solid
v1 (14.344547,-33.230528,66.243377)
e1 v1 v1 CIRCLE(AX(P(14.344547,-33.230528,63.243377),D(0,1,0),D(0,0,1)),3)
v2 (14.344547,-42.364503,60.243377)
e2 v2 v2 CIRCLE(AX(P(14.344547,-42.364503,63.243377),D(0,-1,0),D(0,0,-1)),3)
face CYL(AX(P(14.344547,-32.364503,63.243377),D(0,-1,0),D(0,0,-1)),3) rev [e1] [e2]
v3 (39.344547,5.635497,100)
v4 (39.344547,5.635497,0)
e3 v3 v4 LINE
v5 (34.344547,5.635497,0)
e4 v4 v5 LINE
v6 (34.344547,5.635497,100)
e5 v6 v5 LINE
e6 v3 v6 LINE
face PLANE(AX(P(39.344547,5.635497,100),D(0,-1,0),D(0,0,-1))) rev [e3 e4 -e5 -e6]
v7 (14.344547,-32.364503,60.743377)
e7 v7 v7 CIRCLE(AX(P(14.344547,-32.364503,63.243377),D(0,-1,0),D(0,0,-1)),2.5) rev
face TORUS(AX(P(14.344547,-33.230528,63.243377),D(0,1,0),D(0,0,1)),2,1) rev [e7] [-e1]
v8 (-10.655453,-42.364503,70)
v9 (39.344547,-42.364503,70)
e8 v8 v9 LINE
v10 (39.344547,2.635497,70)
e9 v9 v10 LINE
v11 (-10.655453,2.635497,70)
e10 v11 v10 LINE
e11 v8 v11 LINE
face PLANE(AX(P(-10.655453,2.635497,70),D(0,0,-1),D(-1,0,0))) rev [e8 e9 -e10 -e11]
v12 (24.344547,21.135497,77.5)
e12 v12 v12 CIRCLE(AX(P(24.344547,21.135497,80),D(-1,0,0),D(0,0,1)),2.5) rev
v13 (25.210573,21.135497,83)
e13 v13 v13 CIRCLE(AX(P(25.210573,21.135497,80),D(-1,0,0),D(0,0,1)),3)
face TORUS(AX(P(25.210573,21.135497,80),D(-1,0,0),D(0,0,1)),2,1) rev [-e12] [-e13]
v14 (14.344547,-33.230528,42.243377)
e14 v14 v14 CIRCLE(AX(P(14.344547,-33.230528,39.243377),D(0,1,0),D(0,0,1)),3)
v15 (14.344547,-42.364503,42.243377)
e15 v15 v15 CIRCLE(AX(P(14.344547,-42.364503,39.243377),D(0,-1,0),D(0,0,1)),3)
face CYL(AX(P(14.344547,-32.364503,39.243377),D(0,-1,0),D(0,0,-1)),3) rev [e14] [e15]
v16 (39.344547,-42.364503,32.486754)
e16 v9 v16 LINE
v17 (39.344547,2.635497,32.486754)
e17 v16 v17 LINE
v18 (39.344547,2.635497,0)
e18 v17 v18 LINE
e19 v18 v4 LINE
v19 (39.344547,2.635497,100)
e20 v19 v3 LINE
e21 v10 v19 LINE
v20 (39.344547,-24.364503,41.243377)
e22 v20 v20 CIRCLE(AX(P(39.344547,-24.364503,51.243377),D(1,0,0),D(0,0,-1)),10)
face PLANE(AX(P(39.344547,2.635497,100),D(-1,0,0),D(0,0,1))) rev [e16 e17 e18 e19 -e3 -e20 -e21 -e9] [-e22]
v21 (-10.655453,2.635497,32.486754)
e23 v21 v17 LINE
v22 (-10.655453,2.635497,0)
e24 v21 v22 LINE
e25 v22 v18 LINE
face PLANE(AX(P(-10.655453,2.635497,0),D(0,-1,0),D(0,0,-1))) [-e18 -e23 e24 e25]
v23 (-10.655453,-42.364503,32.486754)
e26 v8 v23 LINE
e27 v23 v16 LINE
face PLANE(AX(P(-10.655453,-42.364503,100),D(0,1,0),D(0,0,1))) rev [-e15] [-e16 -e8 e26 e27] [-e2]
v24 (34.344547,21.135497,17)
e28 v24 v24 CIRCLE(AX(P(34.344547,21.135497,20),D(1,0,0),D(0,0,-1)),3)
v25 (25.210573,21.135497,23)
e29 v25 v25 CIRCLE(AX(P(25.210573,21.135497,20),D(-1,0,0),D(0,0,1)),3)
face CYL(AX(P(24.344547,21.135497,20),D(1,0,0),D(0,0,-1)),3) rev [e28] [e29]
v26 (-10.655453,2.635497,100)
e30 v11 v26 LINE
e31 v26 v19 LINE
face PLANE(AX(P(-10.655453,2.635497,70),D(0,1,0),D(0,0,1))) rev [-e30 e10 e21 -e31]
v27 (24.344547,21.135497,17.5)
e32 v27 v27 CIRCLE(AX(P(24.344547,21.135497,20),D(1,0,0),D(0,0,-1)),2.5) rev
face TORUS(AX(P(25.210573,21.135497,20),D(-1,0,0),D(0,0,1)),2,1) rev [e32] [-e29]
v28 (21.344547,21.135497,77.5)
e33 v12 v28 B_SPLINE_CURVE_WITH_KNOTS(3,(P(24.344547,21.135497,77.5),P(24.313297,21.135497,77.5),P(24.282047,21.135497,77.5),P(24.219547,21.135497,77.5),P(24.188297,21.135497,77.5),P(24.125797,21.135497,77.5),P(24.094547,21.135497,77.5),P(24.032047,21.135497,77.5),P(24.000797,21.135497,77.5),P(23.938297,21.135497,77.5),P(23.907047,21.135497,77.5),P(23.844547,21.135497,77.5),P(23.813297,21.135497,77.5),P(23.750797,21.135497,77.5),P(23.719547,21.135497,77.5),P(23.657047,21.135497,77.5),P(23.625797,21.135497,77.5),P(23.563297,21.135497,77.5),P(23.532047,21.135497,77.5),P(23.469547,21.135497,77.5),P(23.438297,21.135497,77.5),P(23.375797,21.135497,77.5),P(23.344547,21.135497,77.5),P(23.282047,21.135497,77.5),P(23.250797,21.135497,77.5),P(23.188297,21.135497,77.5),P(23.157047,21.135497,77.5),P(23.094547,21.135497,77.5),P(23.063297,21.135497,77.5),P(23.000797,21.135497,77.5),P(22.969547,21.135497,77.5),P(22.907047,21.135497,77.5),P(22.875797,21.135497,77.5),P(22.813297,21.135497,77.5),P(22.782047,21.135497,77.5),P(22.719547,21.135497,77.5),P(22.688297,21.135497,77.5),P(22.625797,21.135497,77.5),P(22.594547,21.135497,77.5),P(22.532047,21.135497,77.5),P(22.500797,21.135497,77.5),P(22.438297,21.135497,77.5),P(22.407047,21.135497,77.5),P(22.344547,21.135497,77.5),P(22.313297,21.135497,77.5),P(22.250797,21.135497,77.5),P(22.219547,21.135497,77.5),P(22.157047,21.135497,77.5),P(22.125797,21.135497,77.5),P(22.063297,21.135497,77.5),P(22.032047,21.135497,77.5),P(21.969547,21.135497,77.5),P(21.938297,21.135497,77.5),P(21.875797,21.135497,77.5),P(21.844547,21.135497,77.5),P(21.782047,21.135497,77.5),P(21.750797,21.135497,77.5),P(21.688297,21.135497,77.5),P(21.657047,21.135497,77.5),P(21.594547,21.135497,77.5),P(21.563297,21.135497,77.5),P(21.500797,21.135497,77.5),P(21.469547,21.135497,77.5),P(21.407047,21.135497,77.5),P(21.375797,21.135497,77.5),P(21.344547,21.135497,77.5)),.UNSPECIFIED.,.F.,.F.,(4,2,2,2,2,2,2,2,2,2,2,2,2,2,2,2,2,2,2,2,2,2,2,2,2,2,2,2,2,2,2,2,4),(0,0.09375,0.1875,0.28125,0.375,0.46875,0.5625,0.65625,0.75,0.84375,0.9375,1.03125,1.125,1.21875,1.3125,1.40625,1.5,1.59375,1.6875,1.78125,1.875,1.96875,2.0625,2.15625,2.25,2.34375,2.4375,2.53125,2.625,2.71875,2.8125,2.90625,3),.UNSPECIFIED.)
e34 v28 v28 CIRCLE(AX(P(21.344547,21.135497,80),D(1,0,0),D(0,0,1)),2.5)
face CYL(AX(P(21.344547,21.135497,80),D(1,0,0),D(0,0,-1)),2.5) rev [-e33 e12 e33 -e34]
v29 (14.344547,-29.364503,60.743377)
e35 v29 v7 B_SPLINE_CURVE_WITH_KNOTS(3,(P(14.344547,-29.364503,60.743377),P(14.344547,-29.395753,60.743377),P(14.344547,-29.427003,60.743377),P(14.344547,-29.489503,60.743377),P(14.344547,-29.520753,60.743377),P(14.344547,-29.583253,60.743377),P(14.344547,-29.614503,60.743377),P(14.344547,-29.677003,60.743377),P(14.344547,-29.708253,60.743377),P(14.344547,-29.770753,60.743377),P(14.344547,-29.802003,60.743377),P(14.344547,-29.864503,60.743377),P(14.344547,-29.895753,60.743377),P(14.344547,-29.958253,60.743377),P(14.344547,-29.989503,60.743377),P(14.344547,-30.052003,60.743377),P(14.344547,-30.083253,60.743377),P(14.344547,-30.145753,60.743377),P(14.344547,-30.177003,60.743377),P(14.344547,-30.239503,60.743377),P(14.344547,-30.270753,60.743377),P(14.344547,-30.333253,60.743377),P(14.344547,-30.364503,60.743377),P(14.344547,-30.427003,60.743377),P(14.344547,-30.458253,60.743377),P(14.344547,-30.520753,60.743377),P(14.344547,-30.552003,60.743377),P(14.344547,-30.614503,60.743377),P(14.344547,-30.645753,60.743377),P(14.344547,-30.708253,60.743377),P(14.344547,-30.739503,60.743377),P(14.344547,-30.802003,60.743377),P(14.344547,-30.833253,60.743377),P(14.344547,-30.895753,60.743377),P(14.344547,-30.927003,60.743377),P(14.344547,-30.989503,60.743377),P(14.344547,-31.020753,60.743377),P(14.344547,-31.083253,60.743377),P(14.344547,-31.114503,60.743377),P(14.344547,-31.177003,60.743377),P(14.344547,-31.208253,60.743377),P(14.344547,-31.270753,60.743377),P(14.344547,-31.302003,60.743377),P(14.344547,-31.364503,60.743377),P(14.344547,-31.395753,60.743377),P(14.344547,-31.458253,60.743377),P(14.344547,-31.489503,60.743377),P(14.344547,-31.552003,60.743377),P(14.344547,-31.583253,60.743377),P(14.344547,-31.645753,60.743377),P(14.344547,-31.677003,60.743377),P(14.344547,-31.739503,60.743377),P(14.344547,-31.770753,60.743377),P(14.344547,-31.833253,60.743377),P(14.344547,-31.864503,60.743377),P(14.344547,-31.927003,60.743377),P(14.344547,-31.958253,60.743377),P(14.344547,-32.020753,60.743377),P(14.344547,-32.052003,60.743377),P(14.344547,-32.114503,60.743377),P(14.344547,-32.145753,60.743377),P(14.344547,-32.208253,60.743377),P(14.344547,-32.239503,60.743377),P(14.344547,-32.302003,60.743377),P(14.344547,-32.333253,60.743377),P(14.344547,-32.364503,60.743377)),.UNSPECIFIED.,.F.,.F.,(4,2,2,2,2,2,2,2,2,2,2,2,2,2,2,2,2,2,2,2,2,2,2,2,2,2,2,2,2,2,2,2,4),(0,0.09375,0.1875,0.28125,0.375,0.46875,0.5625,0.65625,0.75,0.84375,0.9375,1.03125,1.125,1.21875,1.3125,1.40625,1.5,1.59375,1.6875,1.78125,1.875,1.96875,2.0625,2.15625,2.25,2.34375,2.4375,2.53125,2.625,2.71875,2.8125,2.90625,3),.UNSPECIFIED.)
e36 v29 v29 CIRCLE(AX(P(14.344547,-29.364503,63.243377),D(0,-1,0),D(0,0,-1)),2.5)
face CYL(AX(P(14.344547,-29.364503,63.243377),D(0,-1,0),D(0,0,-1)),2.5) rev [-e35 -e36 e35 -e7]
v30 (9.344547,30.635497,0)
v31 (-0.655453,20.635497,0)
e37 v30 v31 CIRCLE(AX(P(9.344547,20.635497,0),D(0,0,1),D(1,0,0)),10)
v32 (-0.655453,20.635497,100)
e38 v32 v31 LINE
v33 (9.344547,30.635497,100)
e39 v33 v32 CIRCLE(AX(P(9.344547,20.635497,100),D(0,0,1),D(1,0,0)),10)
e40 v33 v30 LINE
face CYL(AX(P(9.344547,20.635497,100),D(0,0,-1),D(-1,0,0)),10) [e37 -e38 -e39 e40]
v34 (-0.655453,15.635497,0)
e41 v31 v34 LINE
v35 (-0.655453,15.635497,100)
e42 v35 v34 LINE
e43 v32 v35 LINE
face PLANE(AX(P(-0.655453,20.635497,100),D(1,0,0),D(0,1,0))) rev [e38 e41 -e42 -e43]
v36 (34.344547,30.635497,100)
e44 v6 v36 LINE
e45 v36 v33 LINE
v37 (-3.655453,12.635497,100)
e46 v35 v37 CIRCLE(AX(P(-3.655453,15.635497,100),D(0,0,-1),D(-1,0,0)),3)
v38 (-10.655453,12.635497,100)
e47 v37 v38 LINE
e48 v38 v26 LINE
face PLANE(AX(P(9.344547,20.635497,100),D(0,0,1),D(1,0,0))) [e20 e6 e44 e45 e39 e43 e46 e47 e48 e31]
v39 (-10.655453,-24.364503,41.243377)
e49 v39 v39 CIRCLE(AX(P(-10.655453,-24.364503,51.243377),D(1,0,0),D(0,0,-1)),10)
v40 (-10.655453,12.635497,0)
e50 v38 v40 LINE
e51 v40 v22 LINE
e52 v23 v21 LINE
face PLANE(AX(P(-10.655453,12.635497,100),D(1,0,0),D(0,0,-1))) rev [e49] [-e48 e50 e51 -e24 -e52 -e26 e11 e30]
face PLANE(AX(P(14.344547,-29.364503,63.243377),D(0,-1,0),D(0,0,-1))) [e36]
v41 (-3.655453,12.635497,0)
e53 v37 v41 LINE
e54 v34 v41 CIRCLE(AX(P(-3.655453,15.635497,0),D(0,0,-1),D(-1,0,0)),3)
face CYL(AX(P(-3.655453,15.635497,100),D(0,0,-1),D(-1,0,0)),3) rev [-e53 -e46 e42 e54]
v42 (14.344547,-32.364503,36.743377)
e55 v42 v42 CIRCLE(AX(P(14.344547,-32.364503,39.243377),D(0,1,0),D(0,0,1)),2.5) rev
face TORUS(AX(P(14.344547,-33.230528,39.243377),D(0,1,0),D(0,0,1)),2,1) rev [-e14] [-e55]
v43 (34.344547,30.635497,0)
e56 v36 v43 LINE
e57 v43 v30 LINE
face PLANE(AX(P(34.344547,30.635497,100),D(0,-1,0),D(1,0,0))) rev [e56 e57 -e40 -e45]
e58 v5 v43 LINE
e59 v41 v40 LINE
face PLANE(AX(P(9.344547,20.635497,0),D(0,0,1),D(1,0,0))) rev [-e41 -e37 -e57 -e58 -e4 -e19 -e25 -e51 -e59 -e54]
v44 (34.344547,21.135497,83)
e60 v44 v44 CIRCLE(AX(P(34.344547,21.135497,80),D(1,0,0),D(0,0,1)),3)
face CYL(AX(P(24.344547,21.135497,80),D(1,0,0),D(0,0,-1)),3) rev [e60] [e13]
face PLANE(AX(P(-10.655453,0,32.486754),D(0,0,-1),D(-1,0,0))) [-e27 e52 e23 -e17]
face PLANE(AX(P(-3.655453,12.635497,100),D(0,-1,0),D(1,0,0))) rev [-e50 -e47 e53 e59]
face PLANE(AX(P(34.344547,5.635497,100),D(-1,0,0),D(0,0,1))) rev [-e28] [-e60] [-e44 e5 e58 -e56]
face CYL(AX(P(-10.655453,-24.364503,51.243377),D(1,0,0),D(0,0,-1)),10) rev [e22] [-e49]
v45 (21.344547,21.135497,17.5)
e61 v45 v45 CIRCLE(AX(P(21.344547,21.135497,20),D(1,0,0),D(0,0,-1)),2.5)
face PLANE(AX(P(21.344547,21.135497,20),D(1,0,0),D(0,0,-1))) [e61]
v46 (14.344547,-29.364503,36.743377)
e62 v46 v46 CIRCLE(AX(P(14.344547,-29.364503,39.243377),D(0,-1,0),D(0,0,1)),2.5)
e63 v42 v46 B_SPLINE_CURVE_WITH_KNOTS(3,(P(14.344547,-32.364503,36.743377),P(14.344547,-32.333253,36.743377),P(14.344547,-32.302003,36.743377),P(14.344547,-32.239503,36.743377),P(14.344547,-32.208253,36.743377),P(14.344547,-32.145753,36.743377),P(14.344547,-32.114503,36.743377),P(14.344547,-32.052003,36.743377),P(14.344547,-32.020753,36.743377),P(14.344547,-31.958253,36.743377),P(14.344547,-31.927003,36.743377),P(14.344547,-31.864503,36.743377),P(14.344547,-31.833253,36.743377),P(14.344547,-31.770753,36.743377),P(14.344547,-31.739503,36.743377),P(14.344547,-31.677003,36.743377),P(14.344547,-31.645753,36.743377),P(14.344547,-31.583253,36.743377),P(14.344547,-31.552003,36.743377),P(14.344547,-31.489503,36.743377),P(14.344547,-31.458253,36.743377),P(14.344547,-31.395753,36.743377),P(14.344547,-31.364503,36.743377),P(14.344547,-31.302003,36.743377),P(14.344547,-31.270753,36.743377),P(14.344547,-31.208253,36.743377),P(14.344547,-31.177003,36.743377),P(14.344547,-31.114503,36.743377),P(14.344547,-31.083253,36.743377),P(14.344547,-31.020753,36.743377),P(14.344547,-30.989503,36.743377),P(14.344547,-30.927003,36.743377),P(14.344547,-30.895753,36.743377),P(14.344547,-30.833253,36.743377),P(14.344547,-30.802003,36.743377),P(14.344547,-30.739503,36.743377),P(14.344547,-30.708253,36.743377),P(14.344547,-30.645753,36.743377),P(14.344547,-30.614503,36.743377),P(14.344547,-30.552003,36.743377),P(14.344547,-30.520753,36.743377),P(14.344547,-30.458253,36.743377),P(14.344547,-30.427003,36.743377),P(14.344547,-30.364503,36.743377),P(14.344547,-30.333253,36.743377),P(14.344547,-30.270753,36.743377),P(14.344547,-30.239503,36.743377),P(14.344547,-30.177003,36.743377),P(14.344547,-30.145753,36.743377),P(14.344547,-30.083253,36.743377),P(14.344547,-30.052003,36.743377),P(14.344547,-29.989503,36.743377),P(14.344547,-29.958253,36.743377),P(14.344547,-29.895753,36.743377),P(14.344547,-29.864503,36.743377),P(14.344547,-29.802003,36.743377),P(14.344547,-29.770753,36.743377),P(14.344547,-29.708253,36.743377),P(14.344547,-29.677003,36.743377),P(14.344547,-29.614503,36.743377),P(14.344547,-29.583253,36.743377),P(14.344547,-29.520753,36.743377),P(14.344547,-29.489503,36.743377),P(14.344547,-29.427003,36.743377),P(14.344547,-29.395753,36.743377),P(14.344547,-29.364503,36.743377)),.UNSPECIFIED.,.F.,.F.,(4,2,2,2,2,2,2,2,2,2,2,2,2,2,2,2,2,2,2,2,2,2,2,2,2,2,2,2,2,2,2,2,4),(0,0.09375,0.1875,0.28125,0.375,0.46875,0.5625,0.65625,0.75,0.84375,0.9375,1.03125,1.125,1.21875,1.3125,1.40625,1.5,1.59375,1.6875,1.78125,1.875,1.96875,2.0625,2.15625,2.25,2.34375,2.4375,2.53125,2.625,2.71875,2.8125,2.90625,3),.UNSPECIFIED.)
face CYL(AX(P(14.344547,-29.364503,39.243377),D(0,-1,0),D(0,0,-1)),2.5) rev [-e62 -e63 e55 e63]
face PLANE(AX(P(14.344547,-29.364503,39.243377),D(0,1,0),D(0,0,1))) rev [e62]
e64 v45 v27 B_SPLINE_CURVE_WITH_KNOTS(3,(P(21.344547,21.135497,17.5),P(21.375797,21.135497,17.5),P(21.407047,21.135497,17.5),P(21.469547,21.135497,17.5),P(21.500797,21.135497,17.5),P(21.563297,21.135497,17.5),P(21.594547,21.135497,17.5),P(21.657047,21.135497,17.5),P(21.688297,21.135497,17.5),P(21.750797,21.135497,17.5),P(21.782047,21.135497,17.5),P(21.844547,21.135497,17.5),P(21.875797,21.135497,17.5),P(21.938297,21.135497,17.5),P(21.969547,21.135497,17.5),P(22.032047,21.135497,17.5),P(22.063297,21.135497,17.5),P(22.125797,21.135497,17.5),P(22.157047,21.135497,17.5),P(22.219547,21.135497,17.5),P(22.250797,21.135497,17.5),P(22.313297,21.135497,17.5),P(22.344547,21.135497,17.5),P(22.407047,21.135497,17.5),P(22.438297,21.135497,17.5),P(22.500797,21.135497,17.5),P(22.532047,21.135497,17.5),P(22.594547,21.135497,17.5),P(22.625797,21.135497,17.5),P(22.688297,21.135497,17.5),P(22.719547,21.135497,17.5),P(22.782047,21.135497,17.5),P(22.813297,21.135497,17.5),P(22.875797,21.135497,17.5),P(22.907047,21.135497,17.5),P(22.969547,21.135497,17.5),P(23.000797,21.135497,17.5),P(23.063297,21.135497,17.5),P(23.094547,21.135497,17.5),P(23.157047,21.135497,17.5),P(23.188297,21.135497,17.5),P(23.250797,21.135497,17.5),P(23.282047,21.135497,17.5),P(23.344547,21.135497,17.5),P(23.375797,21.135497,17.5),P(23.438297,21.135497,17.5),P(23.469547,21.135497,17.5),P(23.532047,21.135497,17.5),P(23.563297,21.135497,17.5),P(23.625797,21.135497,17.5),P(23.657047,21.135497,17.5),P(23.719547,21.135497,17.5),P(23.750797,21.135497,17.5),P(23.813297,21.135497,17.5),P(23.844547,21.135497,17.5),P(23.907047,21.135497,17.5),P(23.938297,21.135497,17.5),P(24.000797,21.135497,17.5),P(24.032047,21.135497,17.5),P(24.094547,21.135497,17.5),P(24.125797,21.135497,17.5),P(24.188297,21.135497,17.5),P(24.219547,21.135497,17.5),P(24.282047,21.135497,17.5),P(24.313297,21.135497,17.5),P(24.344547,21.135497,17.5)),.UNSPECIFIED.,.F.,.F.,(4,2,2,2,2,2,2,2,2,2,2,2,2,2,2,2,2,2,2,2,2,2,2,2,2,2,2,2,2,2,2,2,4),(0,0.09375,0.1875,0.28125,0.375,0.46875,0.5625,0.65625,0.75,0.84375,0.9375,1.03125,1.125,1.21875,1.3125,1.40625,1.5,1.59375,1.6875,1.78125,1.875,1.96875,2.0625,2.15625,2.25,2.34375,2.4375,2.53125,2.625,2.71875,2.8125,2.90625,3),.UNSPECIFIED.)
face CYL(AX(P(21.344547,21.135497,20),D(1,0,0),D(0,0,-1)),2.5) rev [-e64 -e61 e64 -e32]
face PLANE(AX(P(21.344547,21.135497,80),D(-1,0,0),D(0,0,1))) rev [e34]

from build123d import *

# Parameters (mm, degrees)
BOSS_EXTRUDE1_DEPTH = 100
SKETCH3_W           = 32.48675427
SKETCH3_H           = 45
CUT_EXTRUDE5_DEPTH  = 120.560658656
SKETCH7_W           = 30
SKETCH7_H           = 45
CUT_EXTRUDE7_DEPTH  = 120.560658656
SKETCH8_R           = 10
CUT_EXTRUDE8_DEPTH  = 120.560658656
SKETCH9_R           = 2.5
CUT_EXTRUDE9_DEPTH  = 13
SKETCH10_R          = 3
CUT_EXTRUDE10_DEPTH = 10
FILLET1_R           = 1
FILLET2_R           = 1
SKETCH11_R          = 2.5
CUT_EXTRUDE11_DEPTH = 13
SKETCH12_R          = 3
CUT_EXTRUDE12_DEPTH = 10
FILLET3_R           = 1


with BuildPart() as part:
    # Sketch2 → Boss-Extrude1 (new body)
    with BuildSketch(Plane.XY):
        with BuildLine():
            Line((-10.655452858, -42.364502809), (39.344547142, -42.364502809))
            Line((39.344547142, -42.364502809), (39.344547142, 2.635497191))
            Line((39.344547142, 2.635497191), (39.344547142, 5.635497191))
            Line((39.344547142, 5.635497191), (34.344547142, 5.635497191))
            Line((34.344547142, 5.635497191), (34.344547142, 30.635497191))
            Line((34.344547142, 30.635497191), (9.344547142, 30.635497191))
            ThreePointArc((9.344547142, 30.635497191), (2.27347933, 27.706565003), (-0.655452858, 20.635497191))
            Line((-0.655452858, 20.635497191), (-0.655452858, 15.635497191))
            ThreePointArc((-0.655452858, 15.635497191), (-1.534132514, 13.514176848), (-3.655452858, 12.635497191))
            Line((-3.655452858, 12.635497191), (-10.655452858, 12.635497191))
            Line((-10.655452858, 12.635497191), (-10.655452858, -42.364502809))
        make_face()
    extrude(amount=BOSS_EXTRUDE1_DEPTH)

    # Sketch3 → Cut-Extrude5 (cut, through all)
    with BuildSketch(Plane(origin=(39.344547142, 0, 0), x_dir=(0, 0, -1), z_dir=(1, 0, 0))):
        with Locations((-16.243377135, -19.864502809)):
            Rectangle(SKETCH3_W, SKETCH3_H)
    extrude(amount=-CUT_EXTRUDE5_DEPTH, mode=Mode.SUBTRACT)

    # Sketch7 → Cut-Extrude7 (cut, through all)
    with BuildSketch(Plane(origin=(39.344547142, 0, 0), x_dir=(0, 0, -1), z_dir=(1, 0, 0))):
        with Locations((-85, -19.864502809)):
            Rectangle(SKETCH7_W, SKETCH7_H)
    extrude(amount=-CUT_EXTRUDE7_DEPTH, mode=Mode.SUBTRACT)

    # Sketch8 → Cut-Extrude8 (cut, through all)
    with BuildSketch(Plane(origin=(39.344547142, 0, 0), x_dir=(0, 0, -1), z_dir=(1, 0, 0))):
        with Locations((-51.243377135, -24.364502809)):
            Circle(SKETCH8_R)
    extrude(amount=-CUT_EXTRUDE8_DEPTH, mode=Mode.SUBTRACT)

    # Sketch9 → Cut-Extrude9 (cut)
    with BuildSketch(Plane(origin=(34.344547142, 0, 0), x_dir=(0, 0, -1), z_dir=(1, 0, 0))):
        with Locations((-20, 21.135497191)):
            Circle(SKETCH9_R)
        with Locations((-80, 21.135497191)):
            Circle(SKETCH9_R)
    extrude(amount=-CUT_EXTRUDE9_DEPTH, mode=Mode.SUBTRACT)

    # Sketch10 → Cut-Extrude10 (cut)
    with BuildSketch(Plane(origin=(34.344547142, 0, 0), x_dir=(0, 0, -1), z_dir=(1, 0, 0))):
        with Locations((-20, 21.135497191)):
            Circle(SKETCH10_R)
        with Locations(Location((-80, 21.135497191, 0), (0, 0, 180))):
            Circle(SKETCH10_R)
    extrude(amount=-CUT_EXTRUDE10_DEPTH, mode=Mode.SUBTRACT)

    # Fillet1
    # the kernel refuses this fillet: 1 mm, written as the material it adds along each edge
    with BuildSketch(Plane(origin=(24.344547142, 21.135497191, 20), x_dir=(0, 0, -1), z_dir=(0, -1, 0))) as fillet1_piece_1:
        with BuildLine():
            CenterArc((2, 0.866025404), FILLET1_R, 300, 60)
            Line((2.5, 0), (2.51, -0.017320508))
            ThreePointArc((2.51, -0.017320508), (2.75, -0.02), (3, -0.02))
            Line((3, -0.02), (3.02, 0))
            Line((3.02, 0), (3.02, 0.866025404))
            Line((3.02, 0.866025404), (3, 0.866025404))
        make_face()
    revolve(axis=Axis((24.344547142, 21.135497191, 20), (1, 0, 0)))

    # Fillet2
    # the kernel refuses this fillet: 1 mm, written as the material it adds along each edge
    with BuildSketch(Plane(origin=(24.344547142, 21.135497191, 80), x_dir=(0, 0, 1), z_dir=(0, 1, 0))) as fillet2_piece_1:
        with BuildLine():
            CenterArc((2, 0.866025404), FILLET2_R, 300, 60)
            Line((2.5, 0), (2.51, -0.017320508))
            ThreePointArc((2.51, -0.017320508), (2.75, -0.02), (3, -0.02))
            Line((3, -0.02), (3.02, 0))
            Line((3.02, 0), (3.02, 0.866025404))
            Line((3.02, 0.866025404), (3, 0.866025404))
        make_face()
    revolve(axis=Axis((24.344547142, 21.135497191, 80), (1, 0, 0)))

    # Sketch11 → Cut-Extrude11 (cut)
    with BuildSketch(Plane.XZ.offset(42.364502809)):
        with Locations(Location((14.344547142, 63.243377135, 0), (0, 0, 270))):
            Circle(SKETCH11_R)
        with Locations(Location((14.344547142, 39.243377135, 0), (0, 0, 270))):
            Circle(SKETCH11_R)
    extrude(amount=-CUT_EXTRUDE11_DEPTH, mode=Mode.SUBTRACT)

    # Sketch12 → Cut-Extrude12 (cut)
    with BuildSketch(Plane.XZ.offset(42.364502809)):
        with Locations(Location((14.344547142, 63.243377135, 0), (0, 0, 270))):
            Circle(SKETCH12_R)
        with Locations(Location((14.344547142, 39.243377135, 0), (0, 0, 90))):
            Circle(SKETCH12_R)
    extrude(amount=-CUT_EXTRUDE12_DEPTH, mode=Mode.SUBTRACT)

    # Fillet3
    # the kernel refuses this fillet: 1 mm, written as the material it adds along each edge
    with BuildSketch(Plane(origin=(14.344547142, -32.364502809, 63.243377135), x_dir=(0, 0, -1), z_dir=(-1, 0, 0))) as fillet3_piece_1:
        with BuildLine():
            CenterArc((2, 0.866025404), FILLET3_R, 300, 60)
            Line((2.5, 0), (2.51, -0.017320508))
            ThreePointArc((2.51, -0.017320508), (2.75, -0.02), (3, -0.02))
            Line((3, -0.02), (3.02, 0))
            Line((3.02, 0), (3.02, 0.866025404))
            Line((3.02, 0.866025404), (3, 0.866025404))
        make_face()
    revolve(axis=Axis((14.344547142, -32.364502809, 63.243377135), (0, -1, 0)))
    with BuildSketch(Plane(origin=(14.344547142, -32.364502809, 39.243377135), x_dir=(0, 0, 1), z_dir=(1, 0, 0))) as fillet3_piece_2:
        with BuildLine():
            CenterArc((2, 0.866025404), FILLET3_R, 300, 60)
            Line((2.5, 0), (2.51, -0.017320508))
            ThreePointArc((2.51, -0.017320508), (2.75, -0.02), (3, -0.02))
            Line((3, -0.02), (3.02, 0))
            Line((3.02, 0), (3.02, 0.866025404))
            Line((3.02, 0.866025404), (3, 0.866025404))
        make_face()
    revolve(axis=Axis((14.344547142, -32.364502809, 39.243377135), (0, -1, 0)))


solid = part.part
